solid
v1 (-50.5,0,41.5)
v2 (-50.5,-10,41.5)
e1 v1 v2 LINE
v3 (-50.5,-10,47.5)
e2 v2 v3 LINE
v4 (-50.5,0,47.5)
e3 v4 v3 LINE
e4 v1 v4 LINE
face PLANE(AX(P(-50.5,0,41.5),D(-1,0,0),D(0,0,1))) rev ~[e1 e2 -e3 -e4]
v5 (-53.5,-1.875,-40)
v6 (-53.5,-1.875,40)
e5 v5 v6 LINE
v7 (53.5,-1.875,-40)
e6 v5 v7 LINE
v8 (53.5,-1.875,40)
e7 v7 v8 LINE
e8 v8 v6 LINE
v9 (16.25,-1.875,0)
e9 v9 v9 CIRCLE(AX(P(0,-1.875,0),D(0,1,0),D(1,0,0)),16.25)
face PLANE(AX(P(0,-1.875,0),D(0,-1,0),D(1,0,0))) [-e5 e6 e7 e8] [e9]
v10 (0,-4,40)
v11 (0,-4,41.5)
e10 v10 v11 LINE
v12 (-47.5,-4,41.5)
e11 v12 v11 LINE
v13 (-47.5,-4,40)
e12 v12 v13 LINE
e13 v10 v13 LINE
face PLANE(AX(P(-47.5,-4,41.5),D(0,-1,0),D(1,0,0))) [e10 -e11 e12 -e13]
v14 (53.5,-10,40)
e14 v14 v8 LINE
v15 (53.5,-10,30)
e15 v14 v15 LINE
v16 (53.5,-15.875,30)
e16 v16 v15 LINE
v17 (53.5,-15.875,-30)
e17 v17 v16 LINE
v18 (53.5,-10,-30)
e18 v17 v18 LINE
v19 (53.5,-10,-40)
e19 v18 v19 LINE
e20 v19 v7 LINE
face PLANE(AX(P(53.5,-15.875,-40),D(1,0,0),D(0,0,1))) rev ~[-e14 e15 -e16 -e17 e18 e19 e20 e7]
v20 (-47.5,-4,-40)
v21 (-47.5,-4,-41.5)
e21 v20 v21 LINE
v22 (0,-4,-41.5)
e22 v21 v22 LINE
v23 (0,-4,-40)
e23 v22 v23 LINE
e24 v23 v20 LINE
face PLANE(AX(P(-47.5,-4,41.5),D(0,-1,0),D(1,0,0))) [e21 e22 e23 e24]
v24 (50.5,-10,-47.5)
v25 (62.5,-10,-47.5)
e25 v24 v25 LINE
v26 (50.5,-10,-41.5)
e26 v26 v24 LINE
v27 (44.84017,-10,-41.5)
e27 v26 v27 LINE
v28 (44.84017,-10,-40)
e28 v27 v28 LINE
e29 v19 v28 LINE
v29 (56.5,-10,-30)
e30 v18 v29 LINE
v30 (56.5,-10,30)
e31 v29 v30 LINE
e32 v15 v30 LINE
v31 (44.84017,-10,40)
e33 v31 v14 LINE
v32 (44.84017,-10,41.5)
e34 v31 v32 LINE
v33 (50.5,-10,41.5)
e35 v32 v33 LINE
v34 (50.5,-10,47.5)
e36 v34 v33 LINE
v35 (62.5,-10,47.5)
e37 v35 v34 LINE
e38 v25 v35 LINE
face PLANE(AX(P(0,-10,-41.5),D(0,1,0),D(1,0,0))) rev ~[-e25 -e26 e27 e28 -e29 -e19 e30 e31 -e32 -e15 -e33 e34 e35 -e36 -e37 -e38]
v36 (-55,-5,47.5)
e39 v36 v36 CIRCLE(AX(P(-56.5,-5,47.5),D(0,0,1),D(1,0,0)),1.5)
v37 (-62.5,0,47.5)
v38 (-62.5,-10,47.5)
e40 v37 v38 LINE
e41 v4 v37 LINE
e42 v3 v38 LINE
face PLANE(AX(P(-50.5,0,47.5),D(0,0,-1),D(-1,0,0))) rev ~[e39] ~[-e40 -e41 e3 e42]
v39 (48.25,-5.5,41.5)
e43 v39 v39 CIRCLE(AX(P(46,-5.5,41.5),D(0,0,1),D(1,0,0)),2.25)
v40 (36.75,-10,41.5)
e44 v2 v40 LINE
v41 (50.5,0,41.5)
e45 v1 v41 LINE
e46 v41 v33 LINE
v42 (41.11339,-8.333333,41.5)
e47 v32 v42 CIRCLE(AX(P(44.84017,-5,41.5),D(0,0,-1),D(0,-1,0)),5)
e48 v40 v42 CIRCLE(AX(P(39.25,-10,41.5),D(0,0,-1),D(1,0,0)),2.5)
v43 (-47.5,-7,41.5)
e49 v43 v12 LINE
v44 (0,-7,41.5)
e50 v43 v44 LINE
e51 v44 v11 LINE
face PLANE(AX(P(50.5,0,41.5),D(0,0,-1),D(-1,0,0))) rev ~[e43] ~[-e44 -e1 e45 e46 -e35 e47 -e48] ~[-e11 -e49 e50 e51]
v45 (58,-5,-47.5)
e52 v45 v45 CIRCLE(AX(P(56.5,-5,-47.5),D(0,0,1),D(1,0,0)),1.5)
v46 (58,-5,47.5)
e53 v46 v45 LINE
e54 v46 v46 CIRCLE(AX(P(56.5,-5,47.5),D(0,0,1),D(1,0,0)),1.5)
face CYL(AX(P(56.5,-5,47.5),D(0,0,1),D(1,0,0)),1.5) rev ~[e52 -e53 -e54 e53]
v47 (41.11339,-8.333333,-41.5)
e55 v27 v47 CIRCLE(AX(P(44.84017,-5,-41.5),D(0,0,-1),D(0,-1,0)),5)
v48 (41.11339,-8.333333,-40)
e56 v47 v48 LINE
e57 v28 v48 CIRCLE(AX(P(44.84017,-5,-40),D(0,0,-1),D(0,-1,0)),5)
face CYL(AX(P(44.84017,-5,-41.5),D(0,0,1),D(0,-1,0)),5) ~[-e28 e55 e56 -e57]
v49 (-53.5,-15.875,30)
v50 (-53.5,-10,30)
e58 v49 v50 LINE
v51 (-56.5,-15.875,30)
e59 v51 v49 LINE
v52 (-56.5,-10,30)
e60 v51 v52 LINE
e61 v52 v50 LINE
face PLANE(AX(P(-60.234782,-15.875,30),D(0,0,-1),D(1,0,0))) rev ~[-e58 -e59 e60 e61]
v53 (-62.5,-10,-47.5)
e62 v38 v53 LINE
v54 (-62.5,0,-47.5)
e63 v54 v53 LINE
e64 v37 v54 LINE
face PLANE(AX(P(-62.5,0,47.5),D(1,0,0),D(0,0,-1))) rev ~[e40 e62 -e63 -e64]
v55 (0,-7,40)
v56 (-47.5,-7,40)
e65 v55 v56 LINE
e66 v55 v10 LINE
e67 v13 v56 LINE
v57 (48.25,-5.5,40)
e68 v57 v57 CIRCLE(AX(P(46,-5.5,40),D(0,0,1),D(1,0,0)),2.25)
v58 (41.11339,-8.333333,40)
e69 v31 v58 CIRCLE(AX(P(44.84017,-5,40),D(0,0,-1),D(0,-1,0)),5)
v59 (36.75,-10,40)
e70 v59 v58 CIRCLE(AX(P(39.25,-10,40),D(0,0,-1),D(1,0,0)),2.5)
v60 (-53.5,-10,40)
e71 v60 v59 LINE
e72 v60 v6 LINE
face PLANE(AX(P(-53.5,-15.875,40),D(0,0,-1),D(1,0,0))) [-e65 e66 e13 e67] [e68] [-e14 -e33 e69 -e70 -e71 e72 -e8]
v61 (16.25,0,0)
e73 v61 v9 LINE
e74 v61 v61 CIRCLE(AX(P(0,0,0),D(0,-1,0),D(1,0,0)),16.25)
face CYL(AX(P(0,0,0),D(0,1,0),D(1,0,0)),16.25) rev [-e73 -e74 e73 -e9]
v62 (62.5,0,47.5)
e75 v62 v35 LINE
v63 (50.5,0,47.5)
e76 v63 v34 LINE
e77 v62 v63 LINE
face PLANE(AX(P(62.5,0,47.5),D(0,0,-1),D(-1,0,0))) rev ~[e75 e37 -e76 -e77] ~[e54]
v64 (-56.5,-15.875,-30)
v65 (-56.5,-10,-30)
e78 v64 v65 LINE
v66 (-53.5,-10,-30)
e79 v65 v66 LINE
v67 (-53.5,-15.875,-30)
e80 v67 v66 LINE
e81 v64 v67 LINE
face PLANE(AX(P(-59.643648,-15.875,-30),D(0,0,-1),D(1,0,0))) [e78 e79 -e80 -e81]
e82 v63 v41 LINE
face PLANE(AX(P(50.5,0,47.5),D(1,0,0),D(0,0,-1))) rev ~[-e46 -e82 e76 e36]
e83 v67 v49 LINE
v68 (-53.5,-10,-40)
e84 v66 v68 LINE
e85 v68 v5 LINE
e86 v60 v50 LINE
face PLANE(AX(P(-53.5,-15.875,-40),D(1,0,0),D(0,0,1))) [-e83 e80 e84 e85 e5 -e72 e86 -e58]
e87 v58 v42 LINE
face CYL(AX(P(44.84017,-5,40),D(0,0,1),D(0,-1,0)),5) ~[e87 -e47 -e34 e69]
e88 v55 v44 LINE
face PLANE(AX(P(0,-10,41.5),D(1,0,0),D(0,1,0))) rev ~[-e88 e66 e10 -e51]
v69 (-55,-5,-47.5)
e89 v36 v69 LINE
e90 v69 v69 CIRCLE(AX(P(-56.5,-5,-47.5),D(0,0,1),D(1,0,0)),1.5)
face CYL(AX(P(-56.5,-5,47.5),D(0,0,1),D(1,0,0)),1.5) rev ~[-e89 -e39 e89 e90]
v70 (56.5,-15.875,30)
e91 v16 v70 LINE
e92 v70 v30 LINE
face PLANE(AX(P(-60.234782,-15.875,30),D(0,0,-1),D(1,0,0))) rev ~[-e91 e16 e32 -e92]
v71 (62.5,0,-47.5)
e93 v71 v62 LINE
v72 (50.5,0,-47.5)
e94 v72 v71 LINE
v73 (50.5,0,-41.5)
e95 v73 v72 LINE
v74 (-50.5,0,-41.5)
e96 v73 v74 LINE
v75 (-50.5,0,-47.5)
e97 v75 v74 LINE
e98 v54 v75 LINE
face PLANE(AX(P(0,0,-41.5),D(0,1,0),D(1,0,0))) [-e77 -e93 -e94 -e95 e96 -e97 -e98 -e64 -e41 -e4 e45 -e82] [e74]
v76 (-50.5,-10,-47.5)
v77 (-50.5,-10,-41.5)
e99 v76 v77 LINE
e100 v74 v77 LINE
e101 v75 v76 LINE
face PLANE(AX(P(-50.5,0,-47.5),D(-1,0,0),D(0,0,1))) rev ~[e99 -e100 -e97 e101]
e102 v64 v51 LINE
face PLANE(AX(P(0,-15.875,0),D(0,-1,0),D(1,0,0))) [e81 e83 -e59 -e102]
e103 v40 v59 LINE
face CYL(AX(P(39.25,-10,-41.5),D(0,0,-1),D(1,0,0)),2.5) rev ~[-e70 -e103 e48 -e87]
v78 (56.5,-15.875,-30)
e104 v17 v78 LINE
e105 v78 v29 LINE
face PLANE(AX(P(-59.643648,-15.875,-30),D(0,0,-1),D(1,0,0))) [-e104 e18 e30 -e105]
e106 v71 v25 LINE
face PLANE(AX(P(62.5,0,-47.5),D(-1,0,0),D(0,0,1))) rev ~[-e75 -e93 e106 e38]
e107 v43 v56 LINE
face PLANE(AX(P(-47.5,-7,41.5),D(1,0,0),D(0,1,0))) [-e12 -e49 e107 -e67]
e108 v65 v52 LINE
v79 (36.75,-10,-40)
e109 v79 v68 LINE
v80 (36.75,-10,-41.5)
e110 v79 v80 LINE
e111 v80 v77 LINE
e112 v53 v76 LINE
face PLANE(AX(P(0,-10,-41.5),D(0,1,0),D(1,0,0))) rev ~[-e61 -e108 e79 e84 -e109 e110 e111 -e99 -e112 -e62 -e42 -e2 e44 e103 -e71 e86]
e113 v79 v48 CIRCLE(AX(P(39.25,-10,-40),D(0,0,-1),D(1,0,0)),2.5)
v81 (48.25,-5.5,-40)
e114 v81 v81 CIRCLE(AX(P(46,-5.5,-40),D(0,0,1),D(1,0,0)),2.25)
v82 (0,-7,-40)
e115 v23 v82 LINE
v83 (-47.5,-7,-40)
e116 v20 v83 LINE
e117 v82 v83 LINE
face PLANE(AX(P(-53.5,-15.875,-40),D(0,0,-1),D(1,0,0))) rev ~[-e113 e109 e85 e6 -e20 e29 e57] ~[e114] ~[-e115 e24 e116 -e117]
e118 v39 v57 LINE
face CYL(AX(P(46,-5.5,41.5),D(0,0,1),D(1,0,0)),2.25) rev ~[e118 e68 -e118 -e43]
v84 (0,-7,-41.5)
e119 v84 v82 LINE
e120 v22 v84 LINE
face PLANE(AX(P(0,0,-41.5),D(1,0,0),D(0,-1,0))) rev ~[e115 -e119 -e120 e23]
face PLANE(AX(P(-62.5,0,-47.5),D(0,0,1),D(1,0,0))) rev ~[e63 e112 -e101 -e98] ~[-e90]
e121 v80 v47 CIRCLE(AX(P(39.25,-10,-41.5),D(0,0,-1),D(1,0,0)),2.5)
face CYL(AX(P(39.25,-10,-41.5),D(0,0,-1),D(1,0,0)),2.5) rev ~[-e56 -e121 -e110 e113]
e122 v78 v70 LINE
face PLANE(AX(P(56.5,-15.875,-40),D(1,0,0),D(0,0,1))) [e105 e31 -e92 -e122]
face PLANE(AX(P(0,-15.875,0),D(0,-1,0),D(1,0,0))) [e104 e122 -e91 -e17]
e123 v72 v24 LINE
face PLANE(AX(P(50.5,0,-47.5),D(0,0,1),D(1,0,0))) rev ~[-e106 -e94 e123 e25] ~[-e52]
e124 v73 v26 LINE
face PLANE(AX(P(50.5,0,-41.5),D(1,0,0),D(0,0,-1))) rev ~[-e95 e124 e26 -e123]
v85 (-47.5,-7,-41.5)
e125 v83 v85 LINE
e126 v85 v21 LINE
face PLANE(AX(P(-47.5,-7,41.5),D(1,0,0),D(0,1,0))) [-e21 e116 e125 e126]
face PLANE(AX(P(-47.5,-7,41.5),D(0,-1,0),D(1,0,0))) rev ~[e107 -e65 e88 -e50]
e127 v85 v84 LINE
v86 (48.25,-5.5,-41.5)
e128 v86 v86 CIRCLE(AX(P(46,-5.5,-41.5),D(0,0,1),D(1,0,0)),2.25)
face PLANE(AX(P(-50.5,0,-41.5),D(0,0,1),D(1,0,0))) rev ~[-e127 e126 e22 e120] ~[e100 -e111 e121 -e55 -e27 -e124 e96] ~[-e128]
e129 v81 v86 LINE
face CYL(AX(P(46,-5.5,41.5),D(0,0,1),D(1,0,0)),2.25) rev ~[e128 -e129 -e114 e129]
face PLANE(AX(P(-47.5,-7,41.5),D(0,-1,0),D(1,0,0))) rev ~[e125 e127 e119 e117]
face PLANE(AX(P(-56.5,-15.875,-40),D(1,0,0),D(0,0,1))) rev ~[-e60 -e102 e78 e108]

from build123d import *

# Parameters (mm, degrees)
F0_R      = 16.25
F1_DEPTH  = 15.875
F2_W      = 139.2096877098
F2_H      = 115.5483946204
F2_W_2    = 113
F2_H_2    = 80
F3_DEPTH  = 5.875
F4_W      = 107
F4_H      = 80
F5_DEPTH  = 14
F6_W      = 120.5911301091
F6_H      = 13.1527084535
F6_W_2    = 121.3300417974
F6_H_2    = 15.8128053223
F7_DEPTH  = 5.875
F8_R      = 1.5
F8_W      = 89
F8_H      = 3
F9_DEPTH  = 100
F10_W     = 42.4407012761
F10_H     = 10
F11_DEPTH = 1.5
F12_W     = 42.5221920013
F12_H     = 10
F13_DEPTH = 1.5
F14_R     = 2.5
F15_DEPTH = 95.5
F16_R     = 2.25
F17_DEPTH = 200
F18_R     = 5
F19_R     = 1.5
F20_DEPTH = 106.2
F21_R     = 1.5
F22_DEPTH = 121.8


with BuildPart() as f1:
    # F0 (on Front) → F1 (new body)
    with BuildSketch(Plane.XZ):
        Polygon((-50.5, 47.5), (-62.5, 47.5), (-62.5, -47.5), (-50.5, -47.5), (-50.5, -41.5), (50.5, -41.5), (50.5, -47.5), (62.5, -47.5), (62.5, 47.5), (50.5, 47.5), (50.5, 41.5), (-50.5, 41.5), align=None)
        Circle(F0_R, mode=Mode.SUBTRACT)
    extrude(amount=F1_DEPTH)

    # F2 (on face) → F3 (cut)
    with BuildSketch(Plane.XZ.offset(15.875)):
        Rectangle(F2_W, F2_H)
        Rectangle(F2_W_2, F2_H_2, mode=Mode.SUBTRACT)
    extrude(amount=-F3_DEPTH, mode=Mode.SUBTRACT)

    # F4 (on face) → F5 (cut)
    with BuildSketch(Plane.XZ.offset(15.875)):
        Rectangle(F4_W, F4_H)
    extrude(amount=-F5_DEPTH, mode=Mode.SUBTRACT)

    # F6 (on face) → F7 (cut)
    with BuildSketch(Plane.XZ.offset(15.875)):
        with Locations((0.0607829645, 36.5763542267)):
            Rectangle(F6_W, F6_H)
        with Locations((1.0213727103, -37.9064026611)):
            Rectangle(F6_W_2, F6_H_2)
    extrude(amount=-F7_DEPTH, mode=Mode.SUBTRACT)

    # F8 (on face) → F9 (cut)
    with BuildSketch(Plane.XY.offset(41.5)):
        with Locations((46, -5.5)):
            Circle(F8_R)
        with Locations((-3, -5.5)):
            Rectangle(F8_W, F8_H)
    extrude(amount=-F9_DEPTH, mode=Mode.SUBTRACT)

    # F10 (on face) → F11 (join)
    with BuildSketch(Plane.XY.offset(41.5)):
        with Locations((21.220350638, -5)):
            Rectangle(F10_W, F10_H)
    extrude(amount=-F11_DEPTH)

    # F12 (on face) → F13 (join)
    with BuildSketch(Plane(origin=(0, 0, -41.5), x_dir=(1, 0, 0), z_dir=(0, 0, -1))):
        with Locations((21.2610960007, 5)):
            Rectangle(F12_W, F12_H)
    extrude(amount=-F13_DEPTH)

    # F14 (on face) → F15 (cut)
    with BuildSketch(Plane(origin=(0, 0, -41.5), x_dir=(1, 0, 0), z_dir=(0, 0, -1))):
        with Locations((39.25, 10)):
            Circle(F14_R)
    extrude(amount=-F15_DEPTH, mode=Mode.SUBTRACT)

    # F16 (on face) → F17 (cut)
    with BuildSketch(Plane.XY.offset(41.5)):
        with Locations((46, -5.5)):
            Circle(F16_R)
    extrude(amount=-F17_DEPTH, mode=Mode.SUBTRACT)

    # F18
    f18_edges = [f1.edges().sort_by_distance(p)[0] for p in [
        (41.75, -10, -40.75),
        (41.75, -10, 40.75),
    ]]
    fillet(f18_edges, radius=F18_R)

    # F19 (on face) → F20 (cut)
    with BuildSketch(Plane.XY.offset(47.5)):
        with Locations((-56.5, -5)):
            Circle(F19_R)
    extrude(amount=-F20_DEPTH, mode=Mode.SUBTRACT)

    # F21 (on face) → F22 (cut)
    with BuildSketch(Plane.XY.offset(47.5)):
        with Locations((56.5, -5)):
            Circle(F21_R)
    extrude(amount=-F22_DEPTH, mode=Mode.SUBTRACT)


solid = f1.part
